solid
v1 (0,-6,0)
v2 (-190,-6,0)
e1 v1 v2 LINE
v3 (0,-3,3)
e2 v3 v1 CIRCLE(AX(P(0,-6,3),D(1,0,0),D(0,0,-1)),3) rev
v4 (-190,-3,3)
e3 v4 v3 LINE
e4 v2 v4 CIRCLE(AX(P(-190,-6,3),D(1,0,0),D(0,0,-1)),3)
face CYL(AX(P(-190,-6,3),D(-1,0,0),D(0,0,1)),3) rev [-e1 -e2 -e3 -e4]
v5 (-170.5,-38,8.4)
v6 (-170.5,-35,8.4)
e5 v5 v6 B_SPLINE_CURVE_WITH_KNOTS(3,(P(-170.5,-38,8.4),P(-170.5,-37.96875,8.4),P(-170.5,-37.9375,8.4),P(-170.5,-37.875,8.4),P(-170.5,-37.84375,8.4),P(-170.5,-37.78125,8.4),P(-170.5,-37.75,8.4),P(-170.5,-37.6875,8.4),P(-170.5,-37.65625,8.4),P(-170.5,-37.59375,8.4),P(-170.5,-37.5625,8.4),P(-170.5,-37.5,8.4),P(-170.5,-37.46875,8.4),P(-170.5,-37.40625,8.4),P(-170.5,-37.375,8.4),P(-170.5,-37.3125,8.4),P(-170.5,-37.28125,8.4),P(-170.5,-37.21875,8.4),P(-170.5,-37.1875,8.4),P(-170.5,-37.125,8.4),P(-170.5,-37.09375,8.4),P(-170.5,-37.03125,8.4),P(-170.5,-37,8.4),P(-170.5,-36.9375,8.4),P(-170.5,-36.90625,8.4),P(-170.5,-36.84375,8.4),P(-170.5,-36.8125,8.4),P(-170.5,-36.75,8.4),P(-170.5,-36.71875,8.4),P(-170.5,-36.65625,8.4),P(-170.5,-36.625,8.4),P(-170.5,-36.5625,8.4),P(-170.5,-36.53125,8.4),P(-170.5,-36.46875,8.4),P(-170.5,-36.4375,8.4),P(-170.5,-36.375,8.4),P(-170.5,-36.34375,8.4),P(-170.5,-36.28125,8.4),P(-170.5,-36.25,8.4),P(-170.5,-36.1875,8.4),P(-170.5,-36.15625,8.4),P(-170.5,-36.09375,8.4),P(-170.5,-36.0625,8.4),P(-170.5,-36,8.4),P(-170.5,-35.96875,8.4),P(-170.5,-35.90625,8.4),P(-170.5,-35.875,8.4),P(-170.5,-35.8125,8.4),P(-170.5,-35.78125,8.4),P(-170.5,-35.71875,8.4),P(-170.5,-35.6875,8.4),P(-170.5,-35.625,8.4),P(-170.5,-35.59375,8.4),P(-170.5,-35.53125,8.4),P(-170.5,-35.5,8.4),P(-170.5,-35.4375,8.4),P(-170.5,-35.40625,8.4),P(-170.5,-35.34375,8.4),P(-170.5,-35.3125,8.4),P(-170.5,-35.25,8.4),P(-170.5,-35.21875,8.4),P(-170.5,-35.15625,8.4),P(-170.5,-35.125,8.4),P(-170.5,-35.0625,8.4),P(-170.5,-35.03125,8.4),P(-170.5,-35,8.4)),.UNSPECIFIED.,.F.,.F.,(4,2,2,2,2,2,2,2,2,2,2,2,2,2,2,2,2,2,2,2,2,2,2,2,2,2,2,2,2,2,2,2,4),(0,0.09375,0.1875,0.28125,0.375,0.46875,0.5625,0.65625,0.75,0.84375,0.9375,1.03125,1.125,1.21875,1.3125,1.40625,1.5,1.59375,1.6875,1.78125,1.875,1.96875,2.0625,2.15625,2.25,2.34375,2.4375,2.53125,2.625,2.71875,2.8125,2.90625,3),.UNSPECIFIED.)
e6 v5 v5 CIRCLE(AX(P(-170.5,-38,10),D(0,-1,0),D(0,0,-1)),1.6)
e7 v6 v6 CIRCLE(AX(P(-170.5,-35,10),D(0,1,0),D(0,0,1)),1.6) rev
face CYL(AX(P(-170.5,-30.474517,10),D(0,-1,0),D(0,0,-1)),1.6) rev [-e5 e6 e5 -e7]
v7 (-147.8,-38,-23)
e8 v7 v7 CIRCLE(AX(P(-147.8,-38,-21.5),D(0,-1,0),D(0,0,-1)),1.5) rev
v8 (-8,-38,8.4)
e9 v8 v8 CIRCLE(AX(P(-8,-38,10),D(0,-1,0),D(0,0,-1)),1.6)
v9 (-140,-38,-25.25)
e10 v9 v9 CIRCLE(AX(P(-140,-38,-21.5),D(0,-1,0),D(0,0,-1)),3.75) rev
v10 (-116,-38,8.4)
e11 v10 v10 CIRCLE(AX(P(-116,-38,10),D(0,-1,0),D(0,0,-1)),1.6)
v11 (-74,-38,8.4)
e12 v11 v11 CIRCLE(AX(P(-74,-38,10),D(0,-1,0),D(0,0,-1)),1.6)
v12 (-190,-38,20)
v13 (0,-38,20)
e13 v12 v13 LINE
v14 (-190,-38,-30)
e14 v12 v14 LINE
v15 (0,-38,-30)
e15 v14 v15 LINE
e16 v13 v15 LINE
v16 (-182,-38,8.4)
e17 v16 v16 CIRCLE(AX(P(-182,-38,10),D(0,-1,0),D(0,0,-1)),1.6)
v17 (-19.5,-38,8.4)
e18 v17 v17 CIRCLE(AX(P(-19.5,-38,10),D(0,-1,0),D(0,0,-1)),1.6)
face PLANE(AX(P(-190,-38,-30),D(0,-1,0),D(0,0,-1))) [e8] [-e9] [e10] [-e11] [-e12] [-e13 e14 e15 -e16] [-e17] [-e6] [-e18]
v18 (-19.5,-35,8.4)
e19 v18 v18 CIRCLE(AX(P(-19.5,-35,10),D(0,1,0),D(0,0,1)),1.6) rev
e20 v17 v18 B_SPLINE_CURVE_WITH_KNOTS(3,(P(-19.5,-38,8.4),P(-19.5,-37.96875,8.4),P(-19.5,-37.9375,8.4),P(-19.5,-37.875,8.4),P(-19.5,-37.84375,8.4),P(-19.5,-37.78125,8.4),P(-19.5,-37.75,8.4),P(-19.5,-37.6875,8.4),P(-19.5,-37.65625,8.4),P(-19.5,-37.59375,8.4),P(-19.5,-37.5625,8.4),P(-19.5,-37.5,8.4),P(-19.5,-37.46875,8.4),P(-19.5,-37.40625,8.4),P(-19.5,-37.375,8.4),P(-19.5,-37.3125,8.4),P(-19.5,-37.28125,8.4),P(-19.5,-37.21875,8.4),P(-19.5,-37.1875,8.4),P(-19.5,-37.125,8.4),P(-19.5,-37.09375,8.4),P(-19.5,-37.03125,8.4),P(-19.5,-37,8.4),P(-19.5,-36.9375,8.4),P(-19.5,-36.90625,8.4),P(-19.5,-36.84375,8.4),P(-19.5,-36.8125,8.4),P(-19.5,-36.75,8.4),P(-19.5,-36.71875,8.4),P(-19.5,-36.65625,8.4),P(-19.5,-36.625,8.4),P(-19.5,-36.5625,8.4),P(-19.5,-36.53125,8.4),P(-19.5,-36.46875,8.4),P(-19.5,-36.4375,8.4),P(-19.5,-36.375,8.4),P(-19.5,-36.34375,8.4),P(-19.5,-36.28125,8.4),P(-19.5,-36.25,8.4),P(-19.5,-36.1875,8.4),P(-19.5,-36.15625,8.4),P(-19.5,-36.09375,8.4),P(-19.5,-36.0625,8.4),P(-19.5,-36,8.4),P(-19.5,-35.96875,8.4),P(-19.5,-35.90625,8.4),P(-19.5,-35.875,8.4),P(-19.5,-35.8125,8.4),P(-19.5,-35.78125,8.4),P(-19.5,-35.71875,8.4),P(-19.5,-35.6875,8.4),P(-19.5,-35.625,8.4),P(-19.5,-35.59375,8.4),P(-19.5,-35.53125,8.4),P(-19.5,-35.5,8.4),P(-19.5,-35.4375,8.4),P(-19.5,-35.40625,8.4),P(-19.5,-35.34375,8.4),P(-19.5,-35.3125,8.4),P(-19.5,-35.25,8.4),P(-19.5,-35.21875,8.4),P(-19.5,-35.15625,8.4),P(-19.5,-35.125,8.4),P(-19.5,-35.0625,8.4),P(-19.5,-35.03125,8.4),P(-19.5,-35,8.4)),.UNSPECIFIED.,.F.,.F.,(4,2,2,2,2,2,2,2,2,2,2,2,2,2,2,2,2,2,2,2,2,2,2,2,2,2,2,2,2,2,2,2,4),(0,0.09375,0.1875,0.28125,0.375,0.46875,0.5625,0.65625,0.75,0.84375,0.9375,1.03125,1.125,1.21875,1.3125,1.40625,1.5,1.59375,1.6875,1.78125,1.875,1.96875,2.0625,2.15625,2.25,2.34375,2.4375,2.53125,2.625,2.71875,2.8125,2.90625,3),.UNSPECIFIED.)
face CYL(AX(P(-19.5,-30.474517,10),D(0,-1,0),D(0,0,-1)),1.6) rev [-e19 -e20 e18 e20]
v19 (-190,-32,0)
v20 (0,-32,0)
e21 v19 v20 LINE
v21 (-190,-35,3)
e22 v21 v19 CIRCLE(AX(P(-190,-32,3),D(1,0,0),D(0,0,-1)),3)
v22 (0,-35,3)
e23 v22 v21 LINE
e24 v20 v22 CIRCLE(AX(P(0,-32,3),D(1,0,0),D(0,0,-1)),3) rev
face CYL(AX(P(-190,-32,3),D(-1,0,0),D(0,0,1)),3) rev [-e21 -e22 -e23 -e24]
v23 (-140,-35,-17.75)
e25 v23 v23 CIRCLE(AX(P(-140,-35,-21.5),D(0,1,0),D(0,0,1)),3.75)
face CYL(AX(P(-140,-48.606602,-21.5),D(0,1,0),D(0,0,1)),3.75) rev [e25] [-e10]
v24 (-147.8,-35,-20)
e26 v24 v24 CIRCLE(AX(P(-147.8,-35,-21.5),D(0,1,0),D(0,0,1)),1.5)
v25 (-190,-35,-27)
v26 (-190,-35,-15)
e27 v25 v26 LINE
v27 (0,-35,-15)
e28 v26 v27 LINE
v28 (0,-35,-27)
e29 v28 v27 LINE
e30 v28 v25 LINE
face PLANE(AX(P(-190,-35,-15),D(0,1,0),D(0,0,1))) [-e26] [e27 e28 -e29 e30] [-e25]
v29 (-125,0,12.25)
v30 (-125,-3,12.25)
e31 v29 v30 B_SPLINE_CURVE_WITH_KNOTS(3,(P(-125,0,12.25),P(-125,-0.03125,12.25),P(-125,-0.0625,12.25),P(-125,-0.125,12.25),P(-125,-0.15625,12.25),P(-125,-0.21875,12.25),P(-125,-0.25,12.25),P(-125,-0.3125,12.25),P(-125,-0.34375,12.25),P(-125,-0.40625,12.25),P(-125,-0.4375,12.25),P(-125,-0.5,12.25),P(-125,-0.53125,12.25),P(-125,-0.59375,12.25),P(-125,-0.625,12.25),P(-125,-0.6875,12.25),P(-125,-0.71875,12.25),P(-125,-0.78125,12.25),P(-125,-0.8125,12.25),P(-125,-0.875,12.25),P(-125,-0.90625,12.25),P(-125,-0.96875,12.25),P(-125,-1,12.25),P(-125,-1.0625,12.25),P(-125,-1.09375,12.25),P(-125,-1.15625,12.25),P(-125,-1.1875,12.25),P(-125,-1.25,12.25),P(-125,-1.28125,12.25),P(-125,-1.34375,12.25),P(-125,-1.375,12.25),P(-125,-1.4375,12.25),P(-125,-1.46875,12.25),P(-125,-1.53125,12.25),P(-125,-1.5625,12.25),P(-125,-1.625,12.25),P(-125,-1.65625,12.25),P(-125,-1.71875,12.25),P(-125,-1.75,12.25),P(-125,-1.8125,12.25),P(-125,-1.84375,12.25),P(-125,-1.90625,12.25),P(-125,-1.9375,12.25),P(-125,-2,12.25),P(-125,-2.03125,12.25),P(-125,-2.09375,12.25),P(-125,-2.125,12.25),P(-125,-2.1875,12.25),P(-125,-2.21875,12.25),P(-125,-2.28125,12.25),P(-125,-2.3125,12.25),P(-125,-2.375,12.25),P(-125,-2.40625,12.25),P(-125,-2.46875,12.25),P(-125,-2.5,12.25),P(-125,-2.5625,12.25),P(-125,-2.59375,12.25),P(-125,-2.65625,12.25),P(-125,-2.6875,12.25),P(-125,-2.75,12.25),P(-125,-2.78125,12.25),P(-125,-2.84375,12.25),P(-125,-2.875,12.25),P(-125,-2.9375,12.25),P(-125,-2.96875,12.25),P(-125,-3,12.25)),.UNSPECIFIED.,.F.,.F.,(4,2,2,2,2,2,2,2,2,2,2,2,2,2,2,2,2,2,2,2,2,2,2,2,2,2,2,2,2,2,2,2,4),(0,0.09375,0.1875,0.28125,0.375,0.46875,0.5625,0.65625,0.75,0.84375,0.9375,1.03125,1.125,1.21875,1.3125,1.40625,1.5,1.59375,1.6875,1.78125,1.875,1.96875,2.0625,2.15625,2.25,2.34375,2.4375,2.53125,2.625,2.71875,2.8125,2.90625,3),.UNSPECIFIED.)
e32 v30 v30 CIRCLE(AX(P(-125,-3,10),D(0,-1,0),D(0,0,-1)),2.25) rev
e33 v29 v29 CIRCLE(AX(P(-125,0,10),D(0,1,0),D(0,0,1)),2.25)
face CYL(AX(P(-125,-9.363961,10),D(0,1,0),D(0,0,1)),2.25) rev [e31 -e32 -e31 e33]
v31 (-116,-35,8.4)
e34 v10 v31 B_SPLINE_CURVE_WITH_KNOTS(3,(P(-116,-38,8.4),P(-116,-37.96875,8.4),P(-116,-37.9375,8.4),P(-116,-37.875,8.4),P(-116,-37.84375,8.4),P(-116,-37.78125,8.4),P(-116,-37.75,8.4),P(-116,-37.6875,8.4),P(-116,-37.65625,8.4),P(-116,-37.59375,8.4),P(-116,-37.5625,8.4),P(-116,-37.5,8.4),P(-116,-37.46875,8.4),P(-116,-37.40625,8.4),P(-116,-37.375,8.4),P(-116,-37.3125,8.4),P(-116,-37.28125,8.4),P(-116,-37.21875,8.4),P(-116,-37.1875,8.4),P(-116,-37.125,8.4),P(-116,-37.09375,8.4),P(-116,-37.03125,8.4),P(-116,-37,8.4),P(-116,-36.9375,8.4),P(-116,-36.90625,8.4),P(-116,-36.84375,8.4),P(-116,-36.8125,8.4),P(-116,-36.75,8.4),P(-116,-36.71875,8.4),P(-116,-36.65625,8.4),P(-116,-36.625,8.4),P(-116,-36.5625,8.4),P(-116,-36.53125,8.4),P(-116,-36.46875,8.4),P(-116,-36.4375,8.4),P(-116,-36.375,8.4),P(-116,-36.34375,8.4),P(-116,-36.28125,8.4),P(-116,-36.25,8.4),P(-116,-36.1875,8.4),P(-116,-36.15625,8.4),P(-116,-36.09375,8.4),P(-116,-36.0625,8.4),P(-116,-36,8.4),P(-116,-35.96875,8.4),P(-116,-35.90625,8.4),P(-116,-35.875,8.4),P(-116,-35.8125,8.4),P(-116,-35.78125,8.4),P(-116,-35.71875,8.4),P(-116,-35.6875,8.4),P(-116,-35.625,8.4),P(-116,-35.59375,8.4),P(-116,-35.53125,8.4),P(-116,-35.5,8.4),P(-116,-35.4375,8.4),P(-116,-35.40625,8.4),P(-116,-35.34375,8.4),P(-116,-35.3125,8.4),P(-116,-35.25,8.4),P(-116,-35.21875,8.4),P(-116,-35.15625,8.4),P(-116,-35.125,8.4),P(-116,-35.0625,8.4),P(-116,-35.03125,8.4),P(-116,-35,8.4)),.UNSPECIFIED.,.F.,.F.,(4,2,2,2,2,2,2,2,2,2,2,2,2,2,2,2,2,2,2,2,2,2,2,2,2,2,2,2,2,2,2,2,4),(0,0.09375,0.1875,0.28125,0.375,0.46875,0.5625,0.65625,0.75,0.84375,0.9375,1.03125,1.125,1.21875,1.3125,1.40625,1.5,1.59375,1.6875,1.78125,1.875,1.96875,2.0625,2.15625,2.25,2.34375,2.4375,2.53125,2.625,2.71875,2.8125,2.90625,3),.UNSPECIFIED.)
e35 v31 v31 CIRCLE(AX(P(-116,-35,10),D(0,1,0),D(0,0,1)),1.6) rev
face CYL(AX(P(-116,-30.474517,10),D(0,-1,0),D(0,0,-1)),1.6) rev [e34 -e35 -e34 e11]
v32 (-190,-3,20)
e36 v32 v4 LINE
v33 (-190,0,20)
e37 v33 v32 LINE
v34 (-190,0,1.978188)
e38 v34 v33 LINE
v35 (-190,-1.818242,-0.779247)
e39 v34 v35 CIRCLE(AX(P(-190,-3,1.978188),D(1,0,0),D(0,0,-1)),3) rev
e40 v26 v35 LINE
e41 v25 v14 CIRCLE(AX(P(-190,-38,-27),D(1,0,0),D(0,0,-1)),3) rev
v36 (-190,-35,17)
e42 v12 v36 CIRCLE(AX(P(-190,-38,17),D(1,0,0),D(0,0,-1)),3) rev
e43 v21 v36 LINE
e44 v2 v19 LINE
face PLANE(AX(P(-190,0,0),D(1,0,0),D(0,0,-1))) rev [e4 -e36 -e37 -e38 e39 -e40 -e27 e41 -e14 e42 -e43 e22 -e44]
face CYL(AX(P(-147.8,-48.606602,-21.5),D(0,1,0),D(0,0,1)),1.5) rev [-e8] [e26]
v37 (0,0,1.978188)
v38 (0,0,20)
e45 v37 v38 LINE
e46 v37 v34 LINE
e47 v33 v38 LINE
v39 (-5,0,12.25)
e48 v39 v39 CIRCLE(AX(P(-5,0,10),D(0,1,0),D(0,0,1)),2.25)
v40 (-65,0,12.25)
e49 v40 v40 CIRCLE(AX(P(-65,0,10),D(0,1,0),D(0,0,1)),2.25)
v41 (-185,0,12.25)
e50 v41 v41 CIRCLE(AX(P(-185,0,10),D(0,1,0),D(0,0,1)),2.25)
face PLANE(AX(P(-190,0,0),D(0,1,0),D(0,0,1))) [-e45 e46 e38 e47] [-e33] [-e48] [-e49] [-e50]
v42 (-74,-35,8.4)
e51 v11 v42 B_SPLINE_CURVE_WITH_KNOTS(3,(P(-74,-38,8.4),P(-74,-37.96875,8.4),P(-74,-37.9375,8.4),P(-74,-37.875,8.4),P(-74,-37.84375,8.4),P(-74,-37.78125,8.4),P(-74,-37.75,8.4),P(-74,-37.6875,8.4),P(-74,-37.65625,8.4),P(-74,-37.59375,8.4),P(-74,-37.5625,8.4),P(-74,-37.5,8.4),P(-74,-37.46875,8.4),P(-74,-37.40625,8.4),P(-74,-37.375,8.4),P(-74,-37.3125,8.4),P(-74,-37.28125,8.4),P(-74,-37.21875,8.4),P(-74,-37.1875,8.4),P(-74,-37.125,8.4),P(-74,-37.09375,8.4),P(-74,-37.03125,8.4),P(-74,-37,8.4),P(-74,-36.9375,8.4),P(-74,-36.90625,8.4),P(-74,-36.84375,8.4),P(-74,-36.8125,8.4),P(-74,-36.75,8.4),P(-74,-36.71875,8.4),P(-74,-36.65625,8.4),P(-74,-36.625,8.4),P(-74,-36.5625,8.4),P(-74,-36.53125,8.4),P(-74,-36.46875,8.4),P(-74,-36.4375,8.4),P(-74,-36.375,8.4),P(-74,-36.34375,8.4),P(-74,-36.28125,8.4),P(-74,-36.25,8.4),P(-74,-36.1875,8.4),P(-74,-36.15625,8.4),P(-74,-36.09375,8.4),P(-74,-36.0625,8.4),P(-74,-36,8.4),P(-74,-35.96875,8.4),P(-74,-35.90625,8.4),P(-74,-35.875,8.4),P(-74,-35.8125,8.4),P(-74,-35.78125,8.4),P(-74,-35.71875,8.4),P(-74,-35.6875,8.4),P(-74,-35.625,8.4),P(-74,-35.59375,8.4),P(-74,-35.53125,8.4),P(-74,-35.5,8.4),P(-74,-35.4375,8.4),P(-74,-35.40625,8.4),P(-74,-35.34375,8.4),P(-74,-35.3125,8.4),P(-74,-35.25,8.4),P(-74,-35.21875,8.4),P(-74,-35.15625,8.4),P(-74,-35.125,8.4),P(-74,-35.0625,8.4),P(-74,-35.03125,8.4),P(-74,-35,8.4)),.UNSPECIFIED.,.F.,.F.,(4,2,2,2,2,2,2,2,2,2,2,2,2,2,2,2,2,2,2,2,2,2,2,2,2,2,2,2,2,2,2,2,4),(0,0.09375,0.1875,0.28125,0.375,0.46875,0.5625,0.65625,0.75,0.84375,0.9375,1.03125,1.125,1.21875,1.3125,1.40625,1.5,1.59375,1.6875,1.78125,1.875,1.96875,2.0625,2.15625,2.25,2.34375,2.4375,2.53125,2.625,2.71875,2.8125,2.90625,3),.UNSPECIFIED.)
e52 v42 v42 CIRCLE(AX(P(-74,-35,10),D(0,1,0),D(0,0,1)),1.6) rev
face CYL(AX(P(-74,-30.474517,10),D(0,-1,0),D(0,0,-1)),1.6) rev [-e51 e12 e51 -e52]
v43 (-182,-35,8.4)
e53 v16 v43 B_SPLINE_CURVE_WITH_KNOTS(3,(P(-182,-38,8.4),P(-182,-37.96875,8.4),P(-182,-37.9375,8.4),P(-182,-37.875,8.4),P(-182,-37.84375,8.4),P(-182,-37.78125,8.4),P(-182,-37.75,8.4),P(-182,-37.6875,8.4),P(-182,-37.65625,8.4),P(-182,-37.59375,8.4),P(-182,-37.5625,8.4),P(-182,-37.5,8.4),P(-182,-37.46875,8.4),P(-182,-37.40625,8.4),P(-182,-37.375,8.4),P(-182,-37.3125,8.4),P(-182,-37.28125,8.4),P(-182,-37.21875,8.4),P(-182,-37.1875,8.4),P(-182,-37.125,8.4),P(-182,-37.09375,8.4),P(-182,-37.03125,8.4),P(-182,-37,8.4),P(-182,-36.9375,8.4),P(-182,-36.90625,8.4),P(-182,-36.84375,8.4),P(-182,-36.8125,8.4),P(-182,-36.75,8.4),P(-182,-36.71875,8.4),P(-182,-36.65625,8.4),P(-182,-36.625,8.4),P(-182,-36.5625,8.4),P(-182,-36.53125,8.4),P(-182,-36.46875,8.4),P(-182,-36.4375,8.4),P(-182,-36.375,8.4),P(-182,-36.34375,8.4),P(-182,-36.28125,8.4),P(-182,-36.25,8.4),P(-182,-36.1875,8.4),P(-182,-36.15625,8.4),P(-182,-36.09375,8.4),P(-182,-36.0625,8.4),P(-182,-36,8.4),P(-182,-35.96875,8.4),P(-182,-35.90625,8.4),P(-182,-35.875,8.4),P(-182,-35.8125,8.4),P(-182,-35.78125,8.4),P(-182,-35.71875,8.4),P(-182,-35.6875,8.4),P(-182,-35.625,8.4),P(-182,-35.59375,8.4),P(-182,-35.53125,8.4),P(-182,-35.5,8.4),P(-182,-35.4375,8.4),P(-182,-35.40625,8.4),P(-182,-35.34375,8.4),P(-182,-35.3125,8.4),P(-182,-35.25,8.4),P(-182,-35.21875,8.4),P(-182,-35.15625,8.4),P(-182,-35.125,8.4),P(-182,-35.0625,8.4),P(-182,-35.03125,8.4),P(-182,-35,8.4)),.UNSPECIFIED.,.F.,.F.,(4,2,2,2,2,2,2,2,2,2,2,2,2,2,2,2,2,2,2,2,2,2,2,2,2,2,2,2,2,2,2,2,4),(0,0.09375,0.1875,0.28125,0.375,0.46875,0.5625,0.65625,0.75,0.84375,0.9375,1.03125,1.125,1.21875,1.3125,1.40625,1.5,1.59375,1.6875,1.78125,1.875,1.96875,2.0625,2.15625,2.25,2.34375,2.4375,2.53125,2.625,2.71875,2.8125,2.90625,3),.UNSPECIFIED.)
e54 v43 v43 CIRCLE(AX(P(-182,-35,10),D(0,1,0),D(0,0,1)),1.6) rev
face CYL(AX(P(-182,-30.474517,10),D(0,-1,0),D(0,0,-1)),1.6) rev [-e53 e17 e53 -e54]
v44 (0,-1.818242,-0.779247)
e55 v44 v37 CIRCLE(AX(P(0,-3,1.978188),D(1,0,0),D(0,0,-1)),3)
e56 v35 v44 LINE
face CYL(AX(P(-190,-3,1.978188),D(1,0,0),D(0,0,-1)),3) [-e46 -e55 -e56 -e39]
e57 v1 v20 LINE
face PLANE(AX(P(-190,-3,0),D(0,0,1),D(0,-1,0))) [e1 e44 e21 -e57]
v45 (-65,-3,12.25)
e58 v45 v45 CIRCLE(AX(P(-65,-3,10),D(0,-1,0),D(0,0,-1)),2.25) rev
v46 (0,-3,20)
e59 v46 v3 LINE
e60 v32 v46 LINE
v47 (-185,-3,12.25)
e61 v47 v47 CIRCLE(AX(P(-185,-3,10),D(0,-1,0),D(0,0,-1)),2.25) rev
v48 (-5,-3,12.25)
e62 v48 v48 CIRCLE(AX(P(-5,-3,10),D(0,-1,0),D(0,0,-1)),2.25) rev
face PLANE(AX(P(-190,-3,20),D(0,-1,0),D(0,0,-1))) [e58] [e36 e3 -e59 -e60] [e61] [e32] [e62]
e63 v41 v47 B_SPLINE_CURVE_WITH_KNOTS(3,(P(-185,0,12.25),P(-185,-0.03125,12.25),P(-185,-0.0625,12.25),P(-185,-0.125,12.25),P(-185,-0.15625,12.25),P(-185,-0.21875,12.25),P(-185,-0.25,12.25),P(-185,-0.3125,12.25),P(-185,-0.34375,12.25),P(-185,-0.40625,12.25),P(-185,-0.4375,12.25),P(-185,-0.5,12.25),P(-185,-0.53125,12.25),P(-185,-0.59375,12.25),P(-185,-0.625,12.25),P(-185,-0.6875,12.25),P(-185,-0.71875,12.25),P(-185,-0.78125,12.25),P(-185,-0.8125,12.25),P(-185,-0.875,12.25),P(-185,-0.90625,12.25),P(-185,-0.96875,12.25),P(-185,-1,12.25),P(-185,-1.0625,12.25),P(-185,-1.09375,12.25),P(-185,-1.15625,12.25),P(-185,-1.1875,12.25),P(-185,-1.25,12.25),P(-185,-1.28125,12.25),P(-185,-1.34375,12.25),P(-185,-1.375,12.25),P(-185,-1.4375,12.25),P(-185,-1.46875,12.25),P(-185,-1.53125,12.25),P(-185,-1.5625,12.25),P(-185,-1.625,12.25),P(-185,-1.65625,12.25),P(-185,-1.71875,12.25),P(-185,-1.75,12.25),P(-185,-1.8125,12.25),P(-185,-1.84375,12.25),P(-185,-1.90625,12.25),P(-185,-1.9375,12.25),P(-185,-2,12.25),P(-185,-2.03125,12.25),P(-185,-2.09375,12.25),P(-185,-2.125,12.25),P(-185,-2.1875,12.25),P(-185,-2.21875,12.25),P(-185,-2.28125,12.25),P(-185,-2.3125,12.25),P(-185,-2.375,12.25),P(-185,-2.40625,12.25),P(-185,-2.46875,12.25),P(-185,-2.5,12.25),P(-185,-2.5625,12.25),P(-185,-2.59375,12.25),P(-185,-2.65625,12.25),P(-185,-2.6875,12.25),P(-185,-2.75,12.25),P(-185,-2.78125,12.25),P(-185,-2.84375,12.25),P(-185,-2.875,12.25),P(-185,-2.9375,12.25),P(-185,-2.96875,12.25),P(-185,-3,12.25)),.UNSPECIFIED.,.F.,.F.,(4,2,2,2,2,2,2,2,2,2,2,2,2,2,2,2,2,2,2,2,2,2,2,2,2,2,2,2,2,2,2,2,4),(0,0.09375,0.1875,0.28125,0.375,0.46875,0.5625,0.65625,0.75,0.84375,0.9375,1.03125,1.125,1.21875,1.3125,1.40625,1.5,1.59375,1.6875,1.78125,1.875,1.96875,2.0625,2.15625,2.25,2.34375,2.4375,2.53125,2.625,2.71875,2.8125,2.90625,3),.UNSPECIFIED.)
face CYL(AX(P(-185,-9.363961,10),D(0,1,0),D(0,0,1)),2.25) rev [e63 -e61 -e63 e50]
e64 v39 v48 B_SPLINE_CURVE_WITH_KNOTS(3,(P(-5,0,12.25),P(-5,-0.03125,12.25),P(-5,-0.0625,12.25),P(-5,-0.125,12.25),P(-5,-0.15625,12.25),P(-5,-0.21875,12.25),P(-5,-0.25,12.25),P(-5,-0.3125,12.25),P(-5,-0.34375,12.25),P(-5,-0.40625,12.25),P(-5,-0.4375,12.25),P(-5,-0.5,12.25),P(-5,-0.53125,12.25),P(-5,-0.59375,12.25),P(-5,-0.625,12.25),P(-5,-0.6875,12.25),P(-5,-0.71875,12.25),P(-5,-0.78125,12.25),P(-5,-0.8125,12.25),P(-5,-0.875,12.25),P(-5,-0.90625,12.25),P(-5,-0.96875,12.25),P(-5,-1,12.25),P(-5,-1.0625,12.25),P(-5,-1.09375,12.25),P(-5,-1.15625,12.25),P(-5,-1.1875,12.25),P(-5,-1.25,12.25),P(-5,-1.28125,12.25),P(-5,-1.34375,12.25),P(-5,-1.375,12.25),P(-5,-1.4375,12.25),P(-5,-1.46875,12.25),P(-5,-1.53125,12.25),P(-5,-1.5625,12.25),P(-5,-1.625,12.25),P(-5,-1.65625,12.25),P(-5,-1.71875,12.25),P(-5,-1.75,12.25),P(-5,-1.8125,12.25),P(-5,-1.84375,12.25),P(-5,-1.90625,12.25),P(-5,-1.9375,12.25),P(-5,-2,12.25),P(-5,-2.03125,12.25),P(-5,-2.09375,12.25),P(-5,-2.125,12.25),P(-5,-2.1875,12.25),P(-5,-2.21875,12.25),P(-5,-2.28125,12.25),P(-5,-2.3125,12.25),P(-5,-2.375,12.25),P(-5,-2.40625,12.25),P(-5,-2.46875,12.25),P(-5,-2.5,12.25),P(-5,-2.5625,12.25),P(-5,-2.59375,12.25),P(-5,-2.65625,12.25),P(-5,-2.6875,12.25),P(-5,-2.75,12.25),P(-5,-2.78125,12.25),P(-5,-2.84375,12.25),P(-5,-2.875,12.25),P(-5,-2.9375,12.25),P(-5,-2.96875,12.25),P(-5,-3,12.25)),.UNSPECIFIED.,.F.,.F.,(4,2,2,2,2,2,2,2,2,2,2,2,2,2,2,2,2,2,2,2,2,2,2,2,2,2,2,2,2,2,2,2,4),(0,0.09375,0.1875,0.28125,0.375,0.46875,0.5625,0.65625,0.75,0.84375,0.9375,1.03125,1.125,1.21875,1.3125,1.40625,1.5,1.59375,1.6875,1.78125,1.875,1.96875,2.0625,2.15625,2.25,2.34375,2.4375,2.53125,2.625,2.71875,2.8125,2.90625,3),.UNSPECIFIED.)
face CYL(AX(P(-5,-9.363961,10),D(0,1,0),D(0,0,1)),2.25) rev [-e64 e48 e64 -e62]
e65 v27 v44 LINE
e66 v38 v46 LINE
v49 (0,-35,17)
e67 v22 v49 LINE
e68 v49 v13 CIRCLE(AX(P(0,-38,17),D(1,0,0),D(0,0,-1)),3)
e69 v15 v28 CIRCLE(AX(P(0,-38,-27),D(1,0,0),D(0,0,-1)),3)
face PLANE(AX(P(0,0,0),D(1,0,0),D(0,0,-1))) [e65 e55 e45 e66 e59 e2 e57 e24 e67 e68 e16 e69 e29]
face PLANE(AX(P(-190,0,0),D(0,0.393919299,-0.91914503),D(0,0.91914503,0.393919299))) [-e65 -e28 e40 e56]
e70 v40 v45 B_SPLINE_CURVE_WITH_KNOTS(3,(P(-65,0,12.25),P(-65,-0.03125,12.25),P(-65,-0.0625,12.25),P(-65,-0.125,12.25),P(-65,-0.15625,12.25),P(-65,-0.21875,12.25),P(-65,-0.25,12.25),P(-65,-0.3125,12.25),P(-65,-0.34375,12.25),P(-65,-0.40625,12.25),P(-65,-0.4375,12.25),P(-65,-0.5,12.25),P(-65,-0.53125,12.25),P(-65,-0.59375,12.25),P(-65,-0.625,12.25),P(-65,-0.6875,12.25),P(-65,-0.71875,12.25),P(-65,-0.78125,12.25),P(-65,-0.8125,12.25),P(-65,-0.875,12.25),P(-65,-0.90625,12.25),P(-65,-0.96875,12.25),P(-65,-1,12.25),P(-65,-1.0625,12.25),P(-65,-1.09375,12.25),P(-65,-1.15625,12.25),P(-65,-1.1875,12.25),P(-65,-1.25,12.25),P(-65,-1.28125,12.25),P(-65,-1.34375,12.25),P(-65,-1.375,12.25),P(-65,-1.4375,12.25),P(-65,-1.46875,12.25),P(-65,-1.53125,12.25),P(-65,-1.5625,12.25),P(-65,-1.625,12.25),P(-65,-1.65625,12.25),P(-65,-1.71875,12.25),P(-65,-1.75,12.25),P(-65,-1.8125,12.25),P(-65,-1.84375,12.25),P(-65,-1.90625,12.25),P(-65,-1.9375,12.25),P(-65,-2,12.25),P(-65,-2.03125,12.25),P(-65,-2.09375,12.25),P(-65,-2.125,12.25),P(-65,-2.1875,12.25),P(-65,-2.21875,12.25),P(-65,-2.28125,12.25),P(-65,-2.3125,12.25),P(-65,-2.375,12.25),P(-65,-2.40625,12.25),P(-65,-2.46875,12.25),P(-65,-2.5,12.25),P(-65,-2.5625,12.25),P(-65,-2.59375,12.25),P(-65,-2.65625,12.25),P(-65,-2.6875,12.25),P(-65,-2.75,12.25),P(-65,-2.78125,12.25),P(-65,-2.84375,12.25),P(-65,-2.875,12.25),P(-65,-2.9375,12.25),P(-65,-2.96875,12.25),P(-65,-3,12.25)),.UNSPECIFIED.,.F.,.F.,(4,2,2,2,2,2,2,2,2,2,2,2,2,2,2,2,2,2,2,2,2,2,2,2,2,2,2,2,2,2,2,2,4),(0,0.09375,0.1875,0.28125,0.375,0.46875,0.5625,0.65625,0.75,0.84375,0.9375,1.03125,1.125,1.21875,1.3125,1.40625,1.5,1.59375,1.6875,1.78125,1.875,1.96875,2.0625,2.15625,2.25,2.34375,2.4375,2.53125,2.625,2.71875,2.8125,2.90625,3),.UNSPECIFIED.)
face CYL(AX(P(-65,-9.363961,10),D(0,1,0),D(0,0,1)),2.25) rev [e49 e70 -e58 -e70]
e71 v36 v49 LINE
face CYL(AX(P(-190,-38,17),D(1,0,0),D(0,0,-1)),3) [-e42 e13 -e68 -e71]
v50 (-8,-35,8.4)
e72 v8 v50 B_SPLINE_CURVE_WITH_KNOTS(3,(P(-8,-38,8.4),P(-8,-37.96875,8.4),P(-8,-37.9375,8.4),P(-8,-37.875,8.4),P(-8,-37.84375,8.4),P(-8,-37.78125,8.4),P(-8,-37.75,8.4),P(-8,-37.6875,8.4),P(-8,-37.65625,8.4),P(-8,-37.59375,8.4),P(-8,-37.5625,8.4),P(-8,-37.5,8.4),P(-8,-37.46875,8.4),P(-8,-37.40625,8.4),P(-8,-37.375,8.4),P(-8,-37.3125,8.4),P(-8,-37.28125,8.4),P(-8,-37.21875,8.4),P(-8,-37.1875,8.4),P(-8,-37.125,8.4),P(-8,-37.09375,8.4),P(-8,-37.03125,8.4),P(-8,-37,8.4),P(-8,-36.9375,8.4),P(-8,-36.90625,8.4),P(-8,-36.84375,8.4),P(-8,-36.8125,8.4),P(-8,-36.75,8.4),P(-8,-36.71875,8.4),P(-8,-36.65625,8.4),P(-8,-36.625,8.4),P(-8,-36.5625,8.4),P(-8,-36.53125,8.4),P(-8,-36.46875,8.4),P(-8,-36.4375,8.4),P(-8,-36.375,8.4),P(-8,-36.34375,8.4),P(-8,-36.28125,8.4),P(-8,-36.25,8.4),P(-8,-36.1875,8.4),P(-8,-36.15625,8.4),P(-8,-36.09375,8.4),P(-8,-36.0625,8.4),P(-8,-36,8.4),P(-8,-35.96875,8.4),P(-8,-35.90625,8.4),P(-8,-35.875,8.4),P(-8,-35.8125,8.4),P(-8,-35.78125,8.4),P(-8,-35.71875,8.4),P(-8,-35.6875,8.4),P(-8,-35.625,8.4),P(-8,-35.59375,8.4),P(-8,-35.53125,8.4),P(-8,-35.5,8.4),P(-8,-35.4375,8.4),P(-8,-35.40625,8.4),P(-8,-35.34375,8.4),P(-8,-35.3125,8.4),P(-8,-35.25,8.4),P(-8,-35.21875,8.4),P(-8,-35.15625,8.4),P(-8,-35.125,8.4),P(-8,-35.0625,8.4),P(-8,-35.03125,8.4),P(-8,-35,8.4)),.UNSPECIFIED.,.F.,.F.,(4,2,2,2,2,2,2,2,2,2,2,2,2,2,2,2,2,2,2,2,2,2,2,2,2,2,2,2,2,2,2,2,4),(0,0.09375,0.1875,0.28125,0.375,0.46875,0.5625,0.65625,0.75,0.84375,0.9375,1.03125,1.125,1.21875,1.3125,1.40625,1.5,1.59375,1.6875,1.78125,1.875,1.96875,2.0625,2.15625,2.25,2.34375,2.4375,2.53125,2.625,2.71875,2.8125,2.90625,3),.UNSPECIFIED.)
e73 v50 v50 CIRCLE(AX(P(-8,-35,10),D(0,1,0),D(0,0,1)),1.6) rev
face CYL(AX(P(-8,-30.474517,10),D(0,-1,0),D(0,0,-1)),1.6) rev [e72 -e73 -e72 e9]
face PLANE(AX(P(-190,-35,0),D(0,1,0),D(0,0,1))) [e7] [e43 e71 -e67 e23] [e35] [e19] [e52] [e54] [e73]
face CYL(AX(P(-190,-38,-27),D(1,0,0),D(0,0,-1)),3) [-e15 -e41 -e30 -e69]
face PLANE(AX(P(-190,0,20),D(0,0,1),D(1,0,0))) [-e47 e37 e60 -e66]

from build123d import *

# Parameters (mm, degrees)
BOSS_EXTRUDE1_DEPTH = 190
SKETCH2_R           = 2.25
CUT_EXTRUDE1_DEPTH  = 3
SKETCH3_R           = 1.6
CUT_EXTRUDE2_DEPTH  = 3
SKETCH4_R           = 3.75
SKETCH4_R_2         = 1.5
CUT_EXTRUDE3_DEPTH  = 3
FILLET1_R           = 3


with BuildPart() as part:
    # Sketch1 → Boss-Extrude1 (new body)
    with BuildSketch(Plane(origin=(0, 0, 0), x_dir=(0, 0, -1), z_dir=(1, 0, 0))):
        Polygon((0, 0), (-20, 0), (-20, -3), (0, -3), (0, -35), (-20, -35), (-20, -38), (30, -38), (30, -35), (15, -35), align=None)
    extrude(amount=-BOSS_EXTRUDE1_DEPTH)

    # Sketch2 → Cut-Extrude1 (cut)
    with BuildSketch(Plane(origin=(0, 0, 0), x_dir=(1, 0, 0), z_dir=(0, 1, 0))):
        with Locations(Location((-185, -10, 0), (0, 0, 270))):
            Circle(SKETCH2_R)
        with Locations(Location((-125, -10, 0), (0, 0, 270))):
            Circle(SKETCH2_R)
        with Locations(Location((-65, -10, 0), (0, 0, 270))):
            Circle(SKETCH2_R)
        with Locations(Location((-5, -10, 0), (0, 0, 270))):
            Circle(SKETCH2_R)
    extrude(amount=-CUT_EXTRUDE1_DEPTH, mode=Mode.SUBTRACT)

    # Sketch3 → Cut-Extrude2 (cut)
    with BuildSketch(Plane.XZ.offset(38)):
        with Locations(Location((-116, 10, 0), (0, 0, 270))):
            Circle(SKETCH3_R)
        with Locations(Location((-74, 10, 0), (0, 0, 270))):
            Circle(SKETCH3_R)
        with Locations(Location((-182, 10, 0), (0, 0, 270))):
            Circle(SKETCH3_R)
        with Locations(Location((-170.5, 10, 0), (0, 0, 270))):
            Circle(SKETCH3_R)
        with Locations(Location((-19.5, 10, 0), (0, 0, 270))):
            Circle(SKETCH3_R)
        with Locations(Location((-8, 10, 0), (0, 0, 270))):
            Circle(SKETCH3_R)
    extrude(amount=-CUT_EXTRUDE2_DEPTH, mode=Mode.SUBTRACT)

    # Sketch4 → Cut-Extrude3 (cut)
    with BuildSketch(Plane(origin=(0, -35, 0), x_dir=(1, 0, 0), z_dir=(0, 1, 0))):
        with Locations(Location((-140, 21.5, 0), (0, 0, 270))):
            Circle(SKETCH4_R)
        with Locations(Location((-147.8, 21.5, 0), (0, 0, 270))):
            Circle(SKETCH4_R_2)
    extrude(amount=-CUT_EXTRUDE3_DEPTH, mode=Mode.SUBTRACT)

    # Fillet1
    fillet1_edges = [part.edges().sort_by_distance(p)[0] for p in [
        (-95, -35, 0),
        (-95, -3, 0),
        (-95, -35, -30),
        (-95, -35, 20),
        (-95, 0, 0),
    ]]
    fillet(fillet1_edges, radius=FILLET1_R - 0.0001)  # a hair under: the kernel refuses the full size


solid = part.part
